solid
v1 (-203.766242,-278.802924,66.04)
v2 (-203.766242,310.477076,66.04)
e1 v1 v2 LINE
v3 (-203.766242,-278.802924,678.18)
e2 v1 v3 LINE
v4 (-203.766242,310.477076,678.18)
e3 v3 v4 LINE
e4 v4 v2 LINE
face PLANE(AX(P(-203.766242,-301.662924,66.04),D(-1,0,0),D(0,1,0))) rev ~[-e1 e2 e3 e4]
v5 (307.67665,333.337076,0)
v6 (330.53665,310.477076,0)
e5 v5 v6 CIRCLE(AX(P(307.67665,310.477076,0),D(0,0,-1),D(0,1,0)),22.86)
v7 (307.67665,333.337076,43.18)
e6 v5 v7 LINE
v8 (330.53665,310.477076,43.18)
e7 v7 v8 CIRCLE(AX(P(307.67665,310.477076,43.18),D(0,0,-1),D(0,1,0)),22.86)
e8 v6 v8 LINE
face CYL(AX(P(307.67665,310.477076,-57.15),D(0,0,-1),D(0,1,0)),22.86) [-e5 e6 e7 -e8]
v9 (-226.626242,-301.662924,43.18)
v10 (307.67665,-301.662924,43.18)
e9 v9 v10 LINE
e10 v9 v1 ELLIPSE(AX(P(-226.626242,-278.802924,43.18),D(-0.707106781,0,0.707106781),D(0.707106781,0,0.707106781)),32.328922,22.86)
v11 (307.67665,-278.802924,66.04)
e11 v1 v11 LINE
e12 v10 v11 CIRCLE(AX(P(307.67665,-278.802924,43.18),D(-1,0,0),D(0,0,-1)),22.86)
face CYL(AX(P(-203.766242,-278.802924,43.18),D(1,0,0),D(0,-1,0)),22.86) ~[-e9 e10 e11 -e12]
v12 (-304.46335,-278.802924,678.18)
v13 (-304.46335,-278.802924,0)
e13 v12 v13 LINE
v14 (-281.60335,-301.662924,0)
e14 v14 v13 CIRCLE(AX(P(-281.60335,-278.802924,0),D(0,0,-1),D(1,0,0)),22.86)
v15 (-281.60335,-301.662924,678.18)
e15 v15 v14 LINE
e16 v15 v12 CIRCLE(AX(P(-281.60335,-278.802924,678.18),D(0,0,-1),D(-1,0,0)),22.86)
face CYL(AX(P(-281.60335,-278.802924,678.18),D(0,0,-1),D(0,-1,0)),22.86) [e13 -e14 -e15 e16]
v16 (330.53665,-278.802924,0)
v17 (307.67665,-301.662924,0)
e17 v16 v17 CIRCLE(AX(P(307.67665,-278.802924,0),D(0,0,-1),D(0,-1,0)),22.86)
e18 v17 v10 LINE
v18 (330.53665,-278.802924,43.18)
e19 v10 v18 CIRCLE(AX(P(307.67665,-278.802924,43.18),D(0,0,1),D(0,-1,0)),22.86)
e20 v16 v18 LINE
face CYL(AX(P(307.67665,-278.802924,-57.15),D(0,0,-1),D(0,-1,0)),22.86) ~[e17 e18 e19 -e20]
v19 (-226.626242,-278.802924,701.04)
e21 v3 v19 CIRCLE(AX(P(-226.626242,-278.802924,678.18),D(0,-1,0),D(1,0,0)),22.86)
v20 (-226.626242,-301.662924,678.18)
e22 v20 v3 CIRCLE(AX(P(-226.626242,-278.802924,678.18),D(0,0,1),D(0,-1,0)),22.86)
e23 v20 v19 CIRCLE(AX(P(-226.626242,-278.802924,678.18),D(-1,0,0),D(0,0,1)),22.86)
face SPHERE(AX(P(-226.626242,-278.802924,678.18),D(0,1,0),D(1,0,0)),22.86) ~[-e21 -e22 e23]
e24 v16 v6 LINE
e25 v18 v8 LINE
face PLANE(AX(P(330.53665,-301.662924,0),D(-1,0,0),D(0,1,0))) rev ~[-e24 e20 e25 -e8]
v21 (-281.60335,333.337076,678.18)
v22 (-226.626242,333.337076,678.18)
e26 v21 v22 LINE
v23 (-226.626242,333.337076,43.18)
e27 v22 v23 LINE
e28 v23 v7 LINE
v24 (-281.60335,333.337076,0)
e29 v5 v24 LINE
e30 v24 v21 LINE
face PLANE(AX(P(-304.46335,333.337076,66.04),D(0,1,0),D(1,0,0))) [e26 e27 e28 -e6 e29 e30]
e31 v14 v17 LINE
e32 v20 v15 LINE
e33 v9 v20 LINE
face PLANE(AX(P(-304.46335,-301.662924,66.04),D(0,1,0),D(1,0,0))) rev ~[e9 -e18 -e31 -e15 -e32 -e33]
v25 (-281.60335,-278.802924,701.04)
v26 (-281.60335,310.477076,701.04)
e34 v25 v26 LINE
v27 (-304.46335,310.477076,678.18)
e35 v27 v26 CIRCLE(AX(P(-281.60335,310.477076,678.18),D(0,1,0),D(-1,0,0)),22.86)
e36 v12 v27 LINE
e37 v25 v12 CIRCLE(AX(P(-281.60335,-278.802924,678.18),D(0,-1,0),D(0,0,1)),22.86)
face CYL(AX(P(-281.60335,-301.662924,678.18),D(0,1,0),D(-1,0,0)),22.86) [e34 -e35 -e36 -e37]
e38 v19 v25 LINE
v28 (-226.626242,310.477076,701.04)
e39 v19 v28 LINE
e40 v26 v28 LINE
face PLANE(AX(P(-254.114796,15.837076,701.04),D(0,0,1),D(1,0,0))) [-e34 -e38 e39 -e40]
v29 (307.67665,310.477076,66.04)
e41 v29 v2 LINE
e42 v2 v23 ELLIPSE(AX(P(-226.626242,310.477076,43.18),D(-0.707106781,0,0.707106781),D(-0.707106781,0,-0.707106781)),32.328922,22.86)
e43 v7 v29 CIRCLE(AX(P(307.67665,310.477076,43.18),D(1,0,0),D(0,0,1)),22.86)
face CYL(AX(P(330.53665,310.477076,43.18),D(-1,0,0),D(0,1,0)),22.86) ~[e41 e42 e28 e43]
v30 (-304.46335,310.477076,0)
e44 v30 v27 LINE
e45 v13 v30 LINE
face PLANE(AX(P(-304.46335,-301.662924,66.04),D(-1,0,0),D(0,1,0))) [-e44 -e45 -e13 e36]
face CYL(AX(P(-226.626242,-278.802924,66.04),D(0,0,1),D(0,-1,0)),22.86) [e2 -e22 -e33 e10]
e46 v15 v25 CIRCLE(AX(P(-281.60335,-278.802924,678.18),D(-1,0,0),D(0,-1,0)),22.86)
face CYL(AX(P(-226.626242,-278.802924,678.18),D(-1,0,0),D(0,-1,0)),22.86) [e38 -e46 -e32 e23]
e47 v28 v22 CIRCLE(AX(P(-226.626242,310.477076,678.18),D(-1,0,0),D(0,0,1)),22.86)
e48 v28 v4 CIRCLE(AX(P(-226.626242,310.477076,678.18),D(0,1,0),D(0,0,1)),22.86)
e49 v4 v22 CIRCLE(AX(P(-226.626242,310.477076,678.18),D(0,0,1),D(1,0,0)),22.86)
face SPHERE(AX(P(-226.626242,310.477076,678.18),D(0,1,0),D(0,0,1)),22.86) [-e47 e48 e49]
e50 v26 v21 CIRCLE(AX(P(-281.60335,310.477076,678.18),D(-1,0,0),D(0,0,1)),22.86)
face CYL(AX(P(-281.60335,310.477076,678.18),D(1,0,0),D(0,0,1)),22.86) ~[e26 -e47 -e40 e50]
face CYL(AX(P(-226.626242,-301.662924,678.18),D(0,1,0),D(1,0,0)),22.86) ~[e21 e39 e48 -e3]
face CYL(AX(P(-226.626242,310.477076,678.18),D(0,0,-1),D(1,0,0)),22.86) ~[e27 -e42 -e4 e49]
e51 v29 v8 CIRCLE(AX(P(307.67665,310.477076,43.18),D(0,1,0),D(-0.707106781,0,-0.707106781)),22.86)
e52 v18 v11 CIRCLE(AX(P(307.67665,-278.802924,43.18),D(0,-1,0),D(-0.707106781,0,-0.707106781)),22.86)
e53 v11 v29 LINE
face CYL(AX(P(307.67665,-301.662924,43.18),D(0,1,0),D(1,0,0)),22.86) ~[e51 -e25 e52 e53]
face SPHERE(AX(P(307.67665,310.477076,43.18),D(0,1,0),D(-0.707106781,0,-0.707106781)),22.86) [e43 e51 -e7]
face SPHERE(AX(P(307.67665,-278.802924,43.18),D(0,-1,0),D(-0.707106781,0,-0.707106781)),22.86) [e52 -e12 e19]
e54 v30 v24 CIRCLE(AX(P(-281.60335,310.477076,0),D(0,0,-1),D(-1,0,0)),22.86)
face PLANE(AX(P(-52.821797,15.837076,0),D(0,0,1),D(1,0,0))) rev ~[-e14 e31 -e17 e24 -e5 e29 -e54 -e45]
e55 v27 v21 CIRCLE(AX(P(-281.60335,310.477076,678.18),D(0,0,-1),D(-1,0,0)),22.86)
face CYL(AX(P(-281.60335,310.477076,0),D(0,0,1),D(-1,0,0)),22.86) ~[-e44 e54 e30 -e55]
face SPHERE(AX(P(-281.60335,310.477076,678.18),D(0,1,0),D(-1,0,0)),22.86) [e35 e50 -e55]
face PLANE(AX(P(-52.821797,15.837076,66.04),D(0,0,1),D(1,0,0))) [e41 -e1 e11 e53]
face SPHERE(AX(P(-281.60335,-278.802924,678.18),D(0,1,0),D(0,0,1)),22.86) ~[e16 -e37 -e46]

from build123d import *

# Parameters (mm, degrees)
F0_W         = 503.2831068337
F0_H         = 635
F0_W_2       = 131.7168931663
F1_DEPTH     = 66.04
F2_W         = 100.6971086562
F2_H         = 635
F3_DEPTH     = 635
F4_R         = 22.86
F5_R         = 22.86
F6_R         = 22.86
F7_T1_DEPTH  = 100.33
F7_S5_W      = 22.86
F7_S5_H      = 22.86
F7_T6_DEPTH  = 22.86
F7_S11_W     = 22.86
F7_S11_H     = 22.86
F7_T12_DEPTH = 22.86


# Not quite as in the source:
# - a fillet or chamfer that OpenCascade refuses, or shapes differently, is made with other operations: its cross-section is extruded or revolved along the edge and cut away or added


with BuildPart() as f1:
    # F0 (on Top) → F1 (new body)
    with BuildSketch(Plane.XY):
        with Locations((-52.821796909, 15.8370759291)):
            Rectangle(F0_W, F0_H)
        with Locations((264.678203091, 15.8370759291)):
            Rectangle(F0_W_2, F0_H)
    extrude(amount=F1_DEPTH)

    # F2 (on face) → F3 (join)
    with BuildSketch(Plane.XY.offset(66.04)):
        with Locations((-254.1147959977, 15.8370759291)):
            Rectangle(F2_W, F2_H)
    extrude(amount=F3_DEPTH)

    # F4
    f4_edges = [f1.edges().sort_by_distance(p)[0] for p in [
        (-203.766242, 15.837076, 701.04),
        (-304.46335, 15.837076, 701.04),
    ]]
    fillet(f4_edges, radius=F4_R)

    # F5
    f5_edges = [f1.edges().sort_by_distance(p)[0] for p in [
        (-203.766242, -301.662924, 372.11),
        (63.385204, -301.662924, 66.04),
        (330.53665, 15.837076, 66.04),
        (63.385204, 333.337076, 66.04),
    ]]
    fillet(f5_edges, radius=F5_R)

    # F6
    f6_edges = [f1.edges().sort_by_distance(p)[0] for p in [
        (-203.766242, 333.337076, 372.11),
        (-304.46335, 333.337076, 339.09),
    ]]
    fillet(f6_edges, radius=F6_R)

    # F7: fillet of radius 22.86 on 2 edges, made by hand

    # F7_s2 → F7_t1 (cut)
    with BuildSketch(Plane.XY.offset(-57.15)):
        with BuildLine():
            ThreePointArc((307.6766496742, 333.3370759291), (323.8411106921, 326.641536947), (330.5366496742, 310.4770759291))
            Line((330.5366496742, 310.4770759291), (330.5366496742, 333.3370759291))
            Line((330.5366496742, 333.3370759291), (307.6766496742, 333.3370759291))
        make_face()
        with BuildLine():
            ThreePointArc((307.6766496742, -301.6629240709), (323.8411106921, -294.9673850888), (330.5366496742, -278.8029240709))
            Line((330.5366496742, -278.8029240709), (330.5366496742, -301.6629240709))
            Line((330.5366496742, -301.6629240709), (307.6766496742, -301.6629240709))
        make_face()
    extrude(amount=F7_T1_DEPTH, mode=Mode.SUBTRACT)


with BuildPart() as f7_tool4:
    # F7_s5 → F7_t6 (new body)
    with BuildSketch(Plane.XZ.offset(278.8029240709)):
        with Locations((319.1066496742, 54.61)):
            Rectangle(F7_S5_W, F7_S5_H)
    extrude(amount=F7_T6_DEPTH)

    # F7_s7 → F7_t8 (revolve, cut)
    with BuildSketch(Plane(origin=(307.6766496742, -278.8029240709, 43.18), x_dir=(-0.7071067812, 0, -0.7071067812), z_dir=(-0.7071067812, 0, 0.7071067812))):
        with BuildLine():
            ThreePointArc((0, -22.86), (22.86, 0), (0, 22.86))
            Line((0, 22.86), (0, -22.86))
        make_face()
    revolve(axis=Axis((307.6766496742, -278.8029240709, 43.18), (0, -1, 0)), mode=Mode.SUBTRACT)


with BuildPart() as f1_1:
    add(f1.part)

    # F7_t3: cut F7_tool4
    add(f7_tool4.part, mode=Mode.SUBTRACT)


with BuildPart() as f7_tool10:
    # F7_s11 → F7_t12 (new body)
    with BuildSketch(Plane.XZ.offset(-310.4770759291)):
        with Locations((319.1066496742, 54.61)):
            Rectangle(F7_S11_W, F7_S11_H)
    extrude(amount=-F7_T12_DEPTH)

    # F7_s13 → F7_t14 (revolve, cut)
    with BuildSketch(Plane(origin=(307.6766496742, 310.4770759291, 43.18), x_dir=(-0.7071067812, 0, -0.7071067812), z_dir=(0.7071067812, 0, -0.7071067812))):
        with BuildLine():
            ThreePointArc((0, -22.86), (22.86, 0), (0, 22.86))
            Line((0, 22.86), (0, -22.86))
        make_face()
    revolve(axis=Axis((307.6766496742, 310.4770759291, 43.18), (0, 1, 0)), mode=Mode.SUBTRACT)


with BuildPart() as f1_2:
    add(f1_1.part)

    # F7_t9: cut F7_tool10
    add(f7_tool10.part, mode=Mode.SUBTRACT)


solid = f1_2.part
